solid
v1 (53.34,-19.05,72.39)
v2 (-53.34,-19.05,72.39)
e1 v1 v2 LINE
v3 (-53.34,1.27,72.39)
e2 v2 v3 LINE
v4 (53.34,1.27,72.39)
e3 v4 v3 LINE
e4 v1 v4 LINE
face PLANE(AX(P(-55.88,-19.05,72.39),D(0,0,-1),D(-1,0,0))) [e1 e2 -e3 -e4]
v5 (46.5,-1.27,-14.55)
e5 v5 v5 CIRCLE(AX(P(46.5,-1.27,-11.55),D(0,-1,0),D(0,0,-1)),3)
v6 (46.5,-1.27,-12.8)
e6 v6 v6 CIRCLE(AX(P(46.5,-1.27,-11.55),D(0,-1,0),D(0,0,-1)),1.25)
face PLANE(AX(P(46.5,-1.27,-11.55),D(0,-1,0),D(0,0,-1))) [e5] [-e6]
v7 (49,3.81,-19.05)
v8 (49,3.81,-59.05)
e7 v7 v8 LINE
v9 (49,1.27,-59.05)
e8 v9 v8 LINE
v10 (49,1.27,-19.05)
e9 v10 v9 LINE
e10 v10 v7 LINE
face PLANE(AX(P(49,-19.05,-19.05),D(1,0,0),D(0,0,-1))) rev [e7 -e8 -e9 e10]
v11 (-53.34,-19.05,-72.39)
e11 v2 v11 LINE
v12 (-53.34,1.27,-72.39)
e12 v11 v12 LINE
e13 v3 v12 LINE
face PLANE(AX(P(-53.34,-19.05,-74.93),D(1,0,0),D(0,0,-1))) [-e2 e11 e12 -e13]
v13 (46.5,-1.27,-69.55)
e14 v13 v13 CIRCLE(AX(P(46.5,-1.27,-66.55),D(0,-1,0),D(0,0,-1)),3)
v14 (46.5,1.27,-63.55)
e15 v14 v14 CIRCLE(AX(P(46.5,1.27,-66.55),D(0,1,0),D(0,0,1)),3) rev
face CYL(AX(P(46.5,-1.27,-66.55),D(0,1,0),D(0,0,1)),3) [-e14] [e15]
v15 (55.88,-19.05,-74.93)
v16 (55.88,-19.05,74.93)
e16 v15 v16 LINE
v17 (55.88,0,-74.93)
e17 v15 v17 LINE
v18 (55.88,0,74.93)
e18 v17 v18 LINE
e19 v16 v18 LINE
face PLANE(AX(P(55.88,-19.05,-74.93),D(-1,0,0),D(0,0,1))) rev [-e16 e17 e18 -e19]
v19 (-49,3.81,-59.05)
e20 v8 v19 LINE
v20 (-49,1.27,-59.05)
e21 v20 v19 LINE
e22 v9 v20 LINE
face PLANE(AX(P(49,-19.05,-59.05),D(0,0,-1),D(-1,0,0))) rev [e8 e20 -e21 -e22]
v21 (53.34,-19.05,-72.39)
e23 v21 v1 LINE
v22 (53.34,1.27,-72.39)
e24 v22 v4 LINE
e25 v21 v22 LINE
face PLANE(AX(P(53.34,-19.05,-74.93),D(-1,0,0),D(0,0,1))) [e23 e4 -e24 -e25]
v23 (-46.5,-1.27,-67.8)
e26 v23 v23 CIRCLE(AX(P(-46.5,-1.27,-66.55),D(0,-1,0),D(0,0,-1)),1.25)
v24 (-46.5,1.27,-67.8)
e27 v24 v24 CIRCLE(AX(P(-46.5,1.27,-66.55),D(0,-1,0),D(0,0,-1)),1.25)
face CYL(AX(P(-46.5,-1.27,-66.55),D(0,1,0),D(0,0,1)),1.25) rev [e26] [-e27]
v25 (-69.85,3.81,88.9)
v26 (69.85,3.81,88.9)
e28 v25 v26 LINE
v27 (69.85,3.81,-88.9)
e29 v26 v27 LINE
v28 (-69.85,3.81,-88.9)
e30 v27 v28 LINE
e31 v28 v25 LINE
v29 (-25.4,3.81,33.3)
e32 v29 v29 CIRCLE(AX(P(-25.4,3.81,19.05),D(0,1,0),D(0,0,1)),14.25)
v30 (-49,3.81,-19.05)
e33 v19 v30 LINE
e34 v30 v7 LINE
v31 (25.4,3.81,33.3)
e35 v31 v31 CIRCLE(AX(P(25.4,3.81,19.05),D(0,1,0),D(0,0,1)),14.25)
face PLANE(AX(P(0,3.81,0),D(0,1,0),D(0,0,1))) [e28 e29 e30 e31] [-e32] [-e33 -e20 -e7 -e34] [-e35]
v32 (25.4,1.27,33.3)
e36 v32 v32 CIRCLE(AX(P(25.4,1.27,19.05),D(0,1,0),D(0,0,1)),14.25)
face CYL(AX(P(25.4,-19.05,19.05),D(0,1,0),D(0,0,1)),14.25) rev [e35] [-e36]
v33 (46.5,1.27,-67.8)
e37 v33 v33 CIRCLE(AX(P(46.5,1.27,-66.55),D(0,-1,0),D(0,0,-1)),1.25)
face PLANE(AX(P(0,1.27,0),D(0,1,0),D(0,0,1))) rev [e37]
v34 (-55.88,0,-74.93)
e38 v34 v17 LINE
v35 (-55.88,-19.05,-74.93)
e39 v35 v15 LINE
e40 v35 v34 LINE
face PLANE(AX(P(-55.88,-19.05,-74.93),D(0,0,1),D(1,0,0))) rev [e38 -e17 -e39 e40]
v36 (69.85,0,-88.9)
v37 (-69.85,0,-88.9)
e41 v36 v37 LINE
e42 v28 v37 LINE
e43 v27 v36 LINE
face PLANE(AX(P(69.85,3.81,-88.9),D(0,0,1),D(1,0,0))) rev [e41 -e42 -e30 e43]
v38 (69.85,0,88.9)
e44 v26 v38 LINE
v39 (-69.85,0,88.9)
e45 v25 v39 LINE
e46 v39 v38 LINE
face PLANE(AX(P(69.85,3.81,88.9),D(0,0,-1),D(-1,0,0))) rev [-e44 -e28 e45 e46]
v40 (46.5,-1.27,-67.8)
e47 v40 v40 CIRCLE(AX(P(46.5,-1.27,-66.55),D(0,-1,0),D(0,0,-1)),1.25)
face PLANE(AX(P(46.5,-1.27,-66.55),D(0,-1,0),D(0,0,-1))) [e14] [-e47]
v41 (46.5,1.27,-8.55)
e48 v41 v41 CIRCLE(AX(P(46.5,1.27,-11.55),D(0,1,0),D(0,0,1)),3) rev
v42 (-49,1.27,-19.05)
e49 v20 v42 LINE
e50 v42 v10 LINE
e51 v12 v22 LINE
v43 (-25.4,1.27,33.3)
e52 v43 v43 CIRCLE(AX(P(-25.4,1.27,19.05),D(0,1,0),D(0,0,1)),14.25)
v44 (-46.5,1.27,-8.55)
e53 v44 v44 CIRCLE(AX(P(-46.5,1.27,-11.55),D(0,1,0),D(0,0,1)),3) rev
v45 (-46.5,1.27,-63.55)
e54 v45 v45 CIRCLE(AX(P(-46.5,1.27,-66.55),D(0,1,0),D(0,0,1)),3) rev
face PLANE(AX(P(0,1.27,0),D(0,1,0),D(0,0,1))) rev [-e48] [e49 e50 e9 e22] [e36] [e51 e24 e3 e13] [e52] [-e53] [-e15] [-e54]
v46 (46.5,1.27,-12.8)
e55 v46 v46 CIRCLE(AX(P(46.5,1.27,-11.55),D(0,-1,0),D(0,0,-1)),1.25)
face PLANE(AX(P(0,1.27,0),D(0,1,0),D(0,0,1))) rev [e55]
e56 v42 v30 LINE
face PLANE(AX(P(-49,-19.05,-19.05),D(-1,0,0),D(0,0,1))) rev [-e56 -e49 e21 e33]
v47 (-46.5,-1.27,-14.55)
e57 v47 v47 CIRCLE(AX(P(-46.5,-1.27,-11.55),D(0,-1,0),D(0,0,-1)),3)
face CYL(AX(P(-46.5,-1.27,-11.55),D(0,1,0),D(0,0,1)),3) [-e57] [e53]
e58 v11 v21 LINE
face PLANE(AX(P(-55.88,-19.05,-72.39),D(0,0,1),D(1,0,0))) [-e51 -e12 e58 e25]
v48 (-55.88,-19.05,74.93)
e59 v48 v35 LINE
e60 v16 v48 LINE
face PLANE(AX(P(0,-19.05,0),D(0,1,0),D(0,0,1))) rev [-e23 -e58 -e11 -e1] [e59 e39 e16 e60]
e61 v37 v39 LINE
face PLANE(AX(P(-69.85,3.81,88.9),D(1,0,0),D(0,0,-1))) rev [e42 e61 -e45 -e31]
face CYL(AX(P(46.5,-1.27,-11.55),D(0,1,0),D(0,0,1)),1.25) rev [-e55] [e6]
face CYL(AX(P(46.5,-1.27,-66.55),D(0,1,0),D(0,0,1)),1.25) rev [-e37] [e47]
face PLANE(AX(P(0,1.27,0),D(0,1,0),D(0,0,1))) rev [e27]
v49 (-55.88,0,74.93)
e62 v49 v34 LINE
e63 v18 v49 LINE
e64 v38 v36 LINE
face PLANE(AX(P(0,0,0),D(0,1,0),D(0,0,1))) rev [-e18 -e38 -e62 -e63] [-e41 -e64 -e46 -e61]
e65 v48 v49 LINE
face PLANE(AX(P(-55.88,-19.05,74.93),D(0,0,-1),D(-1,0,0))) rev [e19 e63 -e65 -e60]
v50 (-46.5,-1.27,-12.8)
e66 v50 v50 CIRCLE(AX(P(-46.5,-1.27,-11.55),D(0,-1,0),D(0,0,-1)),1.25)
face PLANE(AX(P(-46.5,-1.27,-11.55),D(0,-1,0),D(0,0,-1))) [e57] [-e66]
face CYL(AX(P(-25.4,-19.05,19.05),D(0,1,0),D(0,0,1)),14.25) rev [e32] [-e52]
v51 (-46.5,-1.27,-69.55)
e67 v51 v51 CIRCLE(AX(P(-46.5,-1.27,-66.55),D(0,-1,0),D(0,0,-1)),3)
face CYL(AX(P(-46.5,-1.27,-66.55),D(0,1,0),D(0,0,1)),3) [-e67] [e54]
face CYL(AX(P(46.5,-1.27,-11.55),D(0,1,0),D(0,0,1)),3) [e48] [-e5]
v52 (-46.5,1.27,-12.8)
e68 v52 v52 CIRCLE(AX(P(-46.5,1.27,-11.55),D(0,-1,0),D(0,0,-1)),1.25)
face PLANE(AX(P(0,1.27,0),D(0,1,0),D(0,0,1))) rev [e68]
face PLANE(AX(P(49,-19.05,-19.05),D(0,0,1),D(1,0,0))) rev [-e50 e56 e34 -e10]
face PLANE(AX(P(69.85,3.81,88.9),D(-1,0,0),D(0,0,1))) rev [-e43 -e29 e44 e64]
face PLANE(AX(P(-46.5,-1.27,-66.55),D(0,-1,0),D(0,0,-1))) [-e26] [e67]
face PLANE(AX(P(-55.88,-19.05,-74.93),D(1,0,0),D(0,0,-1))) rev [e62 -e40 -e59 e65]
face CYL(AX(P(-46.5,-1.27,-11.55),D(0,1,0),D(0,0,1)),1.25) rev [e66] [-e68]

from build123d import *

# Parameters (mm, degrees)
SKETCH1_W           = 139.7
SKETCH1_H           = 177.8
BOSS_EXTRUDE1_DEPTH = 3.81
SKETCH2_W           = 111.76
SKETCH2_H           = 149.86
BOSS_EXTRUDE2_DEPTH = 19.05
SHELL1_START        = -72.39
SHELL1_OUTLINE_W    = 106.68
SHELL1_OUTLINE_H    = 20.32
SHELL1_DEPTH        = 144.78
SKETCH3_R           = 14.25
SKETCH3_W           = 98
SKETCH3_H           = 40
CUT_EXTRUDE1_DEPTH  = 116.346487159
SKETCH4_R           = 3
SKETCH4_R_2         = 1.25
BOSS_EXTRUDE3_DEPTH = 2.54


# Read off the part's stored shape, not the designer's step: Shell1
with BuildPart() as part:
    # Sketch1 → Boss-Extrude1 (new body)
    with BuildSketch(Plane(origin=(0, 0, 0), x_dir=(1, 0, 0), z_dir=(0, 1, 0))):
        Rectangle(SKETCH1_W, SKETCH1_H)
    extrude(amount=BOSS_EXTRUDE1_DEPTH)

    # Sketch2 → Boss-Extrude2 (add)
    with BuildSketch(Plane.XZ):
        Rectangle(SKETCH2_W, SKETCH2_H)
    extrude(amount=BOSS_EXTRUDE2_DEPTH)

    # Shell1 outline → Shell1 (cut)
    with BuildSketch(Plane.XY.offset(SHELL1_START)):
        with Locations((0, -8.89)):
            Rectangle(SHELL1_OUTLINE_W, SHELL1_OUTLINE_H)
    extrude(amount=SHELL1_DEPTH, mode=Mode.SUBTRACT)

    # Sketch3 → Cut-Extrude1 (cut, through all)
    with BuildSketch(Plane(origin=(0, 3.81, 0), x_dir=(1, 0, 0), z_dir=(0, 1, 0))):
        with Locations(Location((-25.4, -19.05, 0), (0, 0, 270))):
            Circle(SKETCH3_R)
        with Locations(Location((25.4, -19.05, 0), (0, 0, 270))):
            Circle(SKETCH3_R)
        with Locations((0, 39.05)):
            Rectangle(SKETCH3_W, SKETCH3_H)
    extrude(amount=-CUT_EXTRUDE1_DEPTH, mode=Mode.SUBTRACT)

    # Sketch4 → Boss-Extrude3 (add)
    # profile 1 of 4: a face of its own
    with BuildSketch(Plane.XZ.offset(-1.27)):
        with Locations(Location((-46.5, -11.55, 0), (0, 0, 90))):
            Circle(SKETCH4_R)
        with Locations(Location((-46.5, -11.55, 0), (0, 0, 270))):
            Circle(SKETCH4_R_2, mode=Mode.SUBTRACT)
    # profile 2 of 4: a face of its own
    with BuildSketch(Plane.XZ.offset(-1.27)):
        with Locations(Location((46.5, -11.55, 0), (0, 0, 90))):
            Circle(SKETCH4_R)
        with Locations(Location((46.5, -11.55, 0), (0, 0, 270))):
            Circle(SKETCH4_R_2, mode=Mode.SUBTRACT)
    # profile 3 of 4: a face of its own
    with BuildSketch(Plane.XZ.offset(-1.27)):
        with Locations(Location((46.5, -66.55, 0), (0, 0, 90))):
            Circle(SKETCH4_R)
        with Locations(Location((46.5, -66.55, 0), (0, 0, 270))):
            Circle(SKETCH4_R_2, mode=Mode.SUBTRACT)
    # profile 4 of 4: a face of its own
    with BuildSketch(Plane.XZ.offset(-1.27)):
        with Locations(Location((-46.5, -66.55, 0), (0, 0, 90))):
            Circle(SKETCH4_R)
        with Locations(Location((-46.5, -66.55, 0), (0, 0, 270))):
            Circle(SKETCH4_R_2, mode=Mode.SUBTRACT)
    extrude(amount=BOSS_EXTRUDE3_DEPTH)


solid = part.part
